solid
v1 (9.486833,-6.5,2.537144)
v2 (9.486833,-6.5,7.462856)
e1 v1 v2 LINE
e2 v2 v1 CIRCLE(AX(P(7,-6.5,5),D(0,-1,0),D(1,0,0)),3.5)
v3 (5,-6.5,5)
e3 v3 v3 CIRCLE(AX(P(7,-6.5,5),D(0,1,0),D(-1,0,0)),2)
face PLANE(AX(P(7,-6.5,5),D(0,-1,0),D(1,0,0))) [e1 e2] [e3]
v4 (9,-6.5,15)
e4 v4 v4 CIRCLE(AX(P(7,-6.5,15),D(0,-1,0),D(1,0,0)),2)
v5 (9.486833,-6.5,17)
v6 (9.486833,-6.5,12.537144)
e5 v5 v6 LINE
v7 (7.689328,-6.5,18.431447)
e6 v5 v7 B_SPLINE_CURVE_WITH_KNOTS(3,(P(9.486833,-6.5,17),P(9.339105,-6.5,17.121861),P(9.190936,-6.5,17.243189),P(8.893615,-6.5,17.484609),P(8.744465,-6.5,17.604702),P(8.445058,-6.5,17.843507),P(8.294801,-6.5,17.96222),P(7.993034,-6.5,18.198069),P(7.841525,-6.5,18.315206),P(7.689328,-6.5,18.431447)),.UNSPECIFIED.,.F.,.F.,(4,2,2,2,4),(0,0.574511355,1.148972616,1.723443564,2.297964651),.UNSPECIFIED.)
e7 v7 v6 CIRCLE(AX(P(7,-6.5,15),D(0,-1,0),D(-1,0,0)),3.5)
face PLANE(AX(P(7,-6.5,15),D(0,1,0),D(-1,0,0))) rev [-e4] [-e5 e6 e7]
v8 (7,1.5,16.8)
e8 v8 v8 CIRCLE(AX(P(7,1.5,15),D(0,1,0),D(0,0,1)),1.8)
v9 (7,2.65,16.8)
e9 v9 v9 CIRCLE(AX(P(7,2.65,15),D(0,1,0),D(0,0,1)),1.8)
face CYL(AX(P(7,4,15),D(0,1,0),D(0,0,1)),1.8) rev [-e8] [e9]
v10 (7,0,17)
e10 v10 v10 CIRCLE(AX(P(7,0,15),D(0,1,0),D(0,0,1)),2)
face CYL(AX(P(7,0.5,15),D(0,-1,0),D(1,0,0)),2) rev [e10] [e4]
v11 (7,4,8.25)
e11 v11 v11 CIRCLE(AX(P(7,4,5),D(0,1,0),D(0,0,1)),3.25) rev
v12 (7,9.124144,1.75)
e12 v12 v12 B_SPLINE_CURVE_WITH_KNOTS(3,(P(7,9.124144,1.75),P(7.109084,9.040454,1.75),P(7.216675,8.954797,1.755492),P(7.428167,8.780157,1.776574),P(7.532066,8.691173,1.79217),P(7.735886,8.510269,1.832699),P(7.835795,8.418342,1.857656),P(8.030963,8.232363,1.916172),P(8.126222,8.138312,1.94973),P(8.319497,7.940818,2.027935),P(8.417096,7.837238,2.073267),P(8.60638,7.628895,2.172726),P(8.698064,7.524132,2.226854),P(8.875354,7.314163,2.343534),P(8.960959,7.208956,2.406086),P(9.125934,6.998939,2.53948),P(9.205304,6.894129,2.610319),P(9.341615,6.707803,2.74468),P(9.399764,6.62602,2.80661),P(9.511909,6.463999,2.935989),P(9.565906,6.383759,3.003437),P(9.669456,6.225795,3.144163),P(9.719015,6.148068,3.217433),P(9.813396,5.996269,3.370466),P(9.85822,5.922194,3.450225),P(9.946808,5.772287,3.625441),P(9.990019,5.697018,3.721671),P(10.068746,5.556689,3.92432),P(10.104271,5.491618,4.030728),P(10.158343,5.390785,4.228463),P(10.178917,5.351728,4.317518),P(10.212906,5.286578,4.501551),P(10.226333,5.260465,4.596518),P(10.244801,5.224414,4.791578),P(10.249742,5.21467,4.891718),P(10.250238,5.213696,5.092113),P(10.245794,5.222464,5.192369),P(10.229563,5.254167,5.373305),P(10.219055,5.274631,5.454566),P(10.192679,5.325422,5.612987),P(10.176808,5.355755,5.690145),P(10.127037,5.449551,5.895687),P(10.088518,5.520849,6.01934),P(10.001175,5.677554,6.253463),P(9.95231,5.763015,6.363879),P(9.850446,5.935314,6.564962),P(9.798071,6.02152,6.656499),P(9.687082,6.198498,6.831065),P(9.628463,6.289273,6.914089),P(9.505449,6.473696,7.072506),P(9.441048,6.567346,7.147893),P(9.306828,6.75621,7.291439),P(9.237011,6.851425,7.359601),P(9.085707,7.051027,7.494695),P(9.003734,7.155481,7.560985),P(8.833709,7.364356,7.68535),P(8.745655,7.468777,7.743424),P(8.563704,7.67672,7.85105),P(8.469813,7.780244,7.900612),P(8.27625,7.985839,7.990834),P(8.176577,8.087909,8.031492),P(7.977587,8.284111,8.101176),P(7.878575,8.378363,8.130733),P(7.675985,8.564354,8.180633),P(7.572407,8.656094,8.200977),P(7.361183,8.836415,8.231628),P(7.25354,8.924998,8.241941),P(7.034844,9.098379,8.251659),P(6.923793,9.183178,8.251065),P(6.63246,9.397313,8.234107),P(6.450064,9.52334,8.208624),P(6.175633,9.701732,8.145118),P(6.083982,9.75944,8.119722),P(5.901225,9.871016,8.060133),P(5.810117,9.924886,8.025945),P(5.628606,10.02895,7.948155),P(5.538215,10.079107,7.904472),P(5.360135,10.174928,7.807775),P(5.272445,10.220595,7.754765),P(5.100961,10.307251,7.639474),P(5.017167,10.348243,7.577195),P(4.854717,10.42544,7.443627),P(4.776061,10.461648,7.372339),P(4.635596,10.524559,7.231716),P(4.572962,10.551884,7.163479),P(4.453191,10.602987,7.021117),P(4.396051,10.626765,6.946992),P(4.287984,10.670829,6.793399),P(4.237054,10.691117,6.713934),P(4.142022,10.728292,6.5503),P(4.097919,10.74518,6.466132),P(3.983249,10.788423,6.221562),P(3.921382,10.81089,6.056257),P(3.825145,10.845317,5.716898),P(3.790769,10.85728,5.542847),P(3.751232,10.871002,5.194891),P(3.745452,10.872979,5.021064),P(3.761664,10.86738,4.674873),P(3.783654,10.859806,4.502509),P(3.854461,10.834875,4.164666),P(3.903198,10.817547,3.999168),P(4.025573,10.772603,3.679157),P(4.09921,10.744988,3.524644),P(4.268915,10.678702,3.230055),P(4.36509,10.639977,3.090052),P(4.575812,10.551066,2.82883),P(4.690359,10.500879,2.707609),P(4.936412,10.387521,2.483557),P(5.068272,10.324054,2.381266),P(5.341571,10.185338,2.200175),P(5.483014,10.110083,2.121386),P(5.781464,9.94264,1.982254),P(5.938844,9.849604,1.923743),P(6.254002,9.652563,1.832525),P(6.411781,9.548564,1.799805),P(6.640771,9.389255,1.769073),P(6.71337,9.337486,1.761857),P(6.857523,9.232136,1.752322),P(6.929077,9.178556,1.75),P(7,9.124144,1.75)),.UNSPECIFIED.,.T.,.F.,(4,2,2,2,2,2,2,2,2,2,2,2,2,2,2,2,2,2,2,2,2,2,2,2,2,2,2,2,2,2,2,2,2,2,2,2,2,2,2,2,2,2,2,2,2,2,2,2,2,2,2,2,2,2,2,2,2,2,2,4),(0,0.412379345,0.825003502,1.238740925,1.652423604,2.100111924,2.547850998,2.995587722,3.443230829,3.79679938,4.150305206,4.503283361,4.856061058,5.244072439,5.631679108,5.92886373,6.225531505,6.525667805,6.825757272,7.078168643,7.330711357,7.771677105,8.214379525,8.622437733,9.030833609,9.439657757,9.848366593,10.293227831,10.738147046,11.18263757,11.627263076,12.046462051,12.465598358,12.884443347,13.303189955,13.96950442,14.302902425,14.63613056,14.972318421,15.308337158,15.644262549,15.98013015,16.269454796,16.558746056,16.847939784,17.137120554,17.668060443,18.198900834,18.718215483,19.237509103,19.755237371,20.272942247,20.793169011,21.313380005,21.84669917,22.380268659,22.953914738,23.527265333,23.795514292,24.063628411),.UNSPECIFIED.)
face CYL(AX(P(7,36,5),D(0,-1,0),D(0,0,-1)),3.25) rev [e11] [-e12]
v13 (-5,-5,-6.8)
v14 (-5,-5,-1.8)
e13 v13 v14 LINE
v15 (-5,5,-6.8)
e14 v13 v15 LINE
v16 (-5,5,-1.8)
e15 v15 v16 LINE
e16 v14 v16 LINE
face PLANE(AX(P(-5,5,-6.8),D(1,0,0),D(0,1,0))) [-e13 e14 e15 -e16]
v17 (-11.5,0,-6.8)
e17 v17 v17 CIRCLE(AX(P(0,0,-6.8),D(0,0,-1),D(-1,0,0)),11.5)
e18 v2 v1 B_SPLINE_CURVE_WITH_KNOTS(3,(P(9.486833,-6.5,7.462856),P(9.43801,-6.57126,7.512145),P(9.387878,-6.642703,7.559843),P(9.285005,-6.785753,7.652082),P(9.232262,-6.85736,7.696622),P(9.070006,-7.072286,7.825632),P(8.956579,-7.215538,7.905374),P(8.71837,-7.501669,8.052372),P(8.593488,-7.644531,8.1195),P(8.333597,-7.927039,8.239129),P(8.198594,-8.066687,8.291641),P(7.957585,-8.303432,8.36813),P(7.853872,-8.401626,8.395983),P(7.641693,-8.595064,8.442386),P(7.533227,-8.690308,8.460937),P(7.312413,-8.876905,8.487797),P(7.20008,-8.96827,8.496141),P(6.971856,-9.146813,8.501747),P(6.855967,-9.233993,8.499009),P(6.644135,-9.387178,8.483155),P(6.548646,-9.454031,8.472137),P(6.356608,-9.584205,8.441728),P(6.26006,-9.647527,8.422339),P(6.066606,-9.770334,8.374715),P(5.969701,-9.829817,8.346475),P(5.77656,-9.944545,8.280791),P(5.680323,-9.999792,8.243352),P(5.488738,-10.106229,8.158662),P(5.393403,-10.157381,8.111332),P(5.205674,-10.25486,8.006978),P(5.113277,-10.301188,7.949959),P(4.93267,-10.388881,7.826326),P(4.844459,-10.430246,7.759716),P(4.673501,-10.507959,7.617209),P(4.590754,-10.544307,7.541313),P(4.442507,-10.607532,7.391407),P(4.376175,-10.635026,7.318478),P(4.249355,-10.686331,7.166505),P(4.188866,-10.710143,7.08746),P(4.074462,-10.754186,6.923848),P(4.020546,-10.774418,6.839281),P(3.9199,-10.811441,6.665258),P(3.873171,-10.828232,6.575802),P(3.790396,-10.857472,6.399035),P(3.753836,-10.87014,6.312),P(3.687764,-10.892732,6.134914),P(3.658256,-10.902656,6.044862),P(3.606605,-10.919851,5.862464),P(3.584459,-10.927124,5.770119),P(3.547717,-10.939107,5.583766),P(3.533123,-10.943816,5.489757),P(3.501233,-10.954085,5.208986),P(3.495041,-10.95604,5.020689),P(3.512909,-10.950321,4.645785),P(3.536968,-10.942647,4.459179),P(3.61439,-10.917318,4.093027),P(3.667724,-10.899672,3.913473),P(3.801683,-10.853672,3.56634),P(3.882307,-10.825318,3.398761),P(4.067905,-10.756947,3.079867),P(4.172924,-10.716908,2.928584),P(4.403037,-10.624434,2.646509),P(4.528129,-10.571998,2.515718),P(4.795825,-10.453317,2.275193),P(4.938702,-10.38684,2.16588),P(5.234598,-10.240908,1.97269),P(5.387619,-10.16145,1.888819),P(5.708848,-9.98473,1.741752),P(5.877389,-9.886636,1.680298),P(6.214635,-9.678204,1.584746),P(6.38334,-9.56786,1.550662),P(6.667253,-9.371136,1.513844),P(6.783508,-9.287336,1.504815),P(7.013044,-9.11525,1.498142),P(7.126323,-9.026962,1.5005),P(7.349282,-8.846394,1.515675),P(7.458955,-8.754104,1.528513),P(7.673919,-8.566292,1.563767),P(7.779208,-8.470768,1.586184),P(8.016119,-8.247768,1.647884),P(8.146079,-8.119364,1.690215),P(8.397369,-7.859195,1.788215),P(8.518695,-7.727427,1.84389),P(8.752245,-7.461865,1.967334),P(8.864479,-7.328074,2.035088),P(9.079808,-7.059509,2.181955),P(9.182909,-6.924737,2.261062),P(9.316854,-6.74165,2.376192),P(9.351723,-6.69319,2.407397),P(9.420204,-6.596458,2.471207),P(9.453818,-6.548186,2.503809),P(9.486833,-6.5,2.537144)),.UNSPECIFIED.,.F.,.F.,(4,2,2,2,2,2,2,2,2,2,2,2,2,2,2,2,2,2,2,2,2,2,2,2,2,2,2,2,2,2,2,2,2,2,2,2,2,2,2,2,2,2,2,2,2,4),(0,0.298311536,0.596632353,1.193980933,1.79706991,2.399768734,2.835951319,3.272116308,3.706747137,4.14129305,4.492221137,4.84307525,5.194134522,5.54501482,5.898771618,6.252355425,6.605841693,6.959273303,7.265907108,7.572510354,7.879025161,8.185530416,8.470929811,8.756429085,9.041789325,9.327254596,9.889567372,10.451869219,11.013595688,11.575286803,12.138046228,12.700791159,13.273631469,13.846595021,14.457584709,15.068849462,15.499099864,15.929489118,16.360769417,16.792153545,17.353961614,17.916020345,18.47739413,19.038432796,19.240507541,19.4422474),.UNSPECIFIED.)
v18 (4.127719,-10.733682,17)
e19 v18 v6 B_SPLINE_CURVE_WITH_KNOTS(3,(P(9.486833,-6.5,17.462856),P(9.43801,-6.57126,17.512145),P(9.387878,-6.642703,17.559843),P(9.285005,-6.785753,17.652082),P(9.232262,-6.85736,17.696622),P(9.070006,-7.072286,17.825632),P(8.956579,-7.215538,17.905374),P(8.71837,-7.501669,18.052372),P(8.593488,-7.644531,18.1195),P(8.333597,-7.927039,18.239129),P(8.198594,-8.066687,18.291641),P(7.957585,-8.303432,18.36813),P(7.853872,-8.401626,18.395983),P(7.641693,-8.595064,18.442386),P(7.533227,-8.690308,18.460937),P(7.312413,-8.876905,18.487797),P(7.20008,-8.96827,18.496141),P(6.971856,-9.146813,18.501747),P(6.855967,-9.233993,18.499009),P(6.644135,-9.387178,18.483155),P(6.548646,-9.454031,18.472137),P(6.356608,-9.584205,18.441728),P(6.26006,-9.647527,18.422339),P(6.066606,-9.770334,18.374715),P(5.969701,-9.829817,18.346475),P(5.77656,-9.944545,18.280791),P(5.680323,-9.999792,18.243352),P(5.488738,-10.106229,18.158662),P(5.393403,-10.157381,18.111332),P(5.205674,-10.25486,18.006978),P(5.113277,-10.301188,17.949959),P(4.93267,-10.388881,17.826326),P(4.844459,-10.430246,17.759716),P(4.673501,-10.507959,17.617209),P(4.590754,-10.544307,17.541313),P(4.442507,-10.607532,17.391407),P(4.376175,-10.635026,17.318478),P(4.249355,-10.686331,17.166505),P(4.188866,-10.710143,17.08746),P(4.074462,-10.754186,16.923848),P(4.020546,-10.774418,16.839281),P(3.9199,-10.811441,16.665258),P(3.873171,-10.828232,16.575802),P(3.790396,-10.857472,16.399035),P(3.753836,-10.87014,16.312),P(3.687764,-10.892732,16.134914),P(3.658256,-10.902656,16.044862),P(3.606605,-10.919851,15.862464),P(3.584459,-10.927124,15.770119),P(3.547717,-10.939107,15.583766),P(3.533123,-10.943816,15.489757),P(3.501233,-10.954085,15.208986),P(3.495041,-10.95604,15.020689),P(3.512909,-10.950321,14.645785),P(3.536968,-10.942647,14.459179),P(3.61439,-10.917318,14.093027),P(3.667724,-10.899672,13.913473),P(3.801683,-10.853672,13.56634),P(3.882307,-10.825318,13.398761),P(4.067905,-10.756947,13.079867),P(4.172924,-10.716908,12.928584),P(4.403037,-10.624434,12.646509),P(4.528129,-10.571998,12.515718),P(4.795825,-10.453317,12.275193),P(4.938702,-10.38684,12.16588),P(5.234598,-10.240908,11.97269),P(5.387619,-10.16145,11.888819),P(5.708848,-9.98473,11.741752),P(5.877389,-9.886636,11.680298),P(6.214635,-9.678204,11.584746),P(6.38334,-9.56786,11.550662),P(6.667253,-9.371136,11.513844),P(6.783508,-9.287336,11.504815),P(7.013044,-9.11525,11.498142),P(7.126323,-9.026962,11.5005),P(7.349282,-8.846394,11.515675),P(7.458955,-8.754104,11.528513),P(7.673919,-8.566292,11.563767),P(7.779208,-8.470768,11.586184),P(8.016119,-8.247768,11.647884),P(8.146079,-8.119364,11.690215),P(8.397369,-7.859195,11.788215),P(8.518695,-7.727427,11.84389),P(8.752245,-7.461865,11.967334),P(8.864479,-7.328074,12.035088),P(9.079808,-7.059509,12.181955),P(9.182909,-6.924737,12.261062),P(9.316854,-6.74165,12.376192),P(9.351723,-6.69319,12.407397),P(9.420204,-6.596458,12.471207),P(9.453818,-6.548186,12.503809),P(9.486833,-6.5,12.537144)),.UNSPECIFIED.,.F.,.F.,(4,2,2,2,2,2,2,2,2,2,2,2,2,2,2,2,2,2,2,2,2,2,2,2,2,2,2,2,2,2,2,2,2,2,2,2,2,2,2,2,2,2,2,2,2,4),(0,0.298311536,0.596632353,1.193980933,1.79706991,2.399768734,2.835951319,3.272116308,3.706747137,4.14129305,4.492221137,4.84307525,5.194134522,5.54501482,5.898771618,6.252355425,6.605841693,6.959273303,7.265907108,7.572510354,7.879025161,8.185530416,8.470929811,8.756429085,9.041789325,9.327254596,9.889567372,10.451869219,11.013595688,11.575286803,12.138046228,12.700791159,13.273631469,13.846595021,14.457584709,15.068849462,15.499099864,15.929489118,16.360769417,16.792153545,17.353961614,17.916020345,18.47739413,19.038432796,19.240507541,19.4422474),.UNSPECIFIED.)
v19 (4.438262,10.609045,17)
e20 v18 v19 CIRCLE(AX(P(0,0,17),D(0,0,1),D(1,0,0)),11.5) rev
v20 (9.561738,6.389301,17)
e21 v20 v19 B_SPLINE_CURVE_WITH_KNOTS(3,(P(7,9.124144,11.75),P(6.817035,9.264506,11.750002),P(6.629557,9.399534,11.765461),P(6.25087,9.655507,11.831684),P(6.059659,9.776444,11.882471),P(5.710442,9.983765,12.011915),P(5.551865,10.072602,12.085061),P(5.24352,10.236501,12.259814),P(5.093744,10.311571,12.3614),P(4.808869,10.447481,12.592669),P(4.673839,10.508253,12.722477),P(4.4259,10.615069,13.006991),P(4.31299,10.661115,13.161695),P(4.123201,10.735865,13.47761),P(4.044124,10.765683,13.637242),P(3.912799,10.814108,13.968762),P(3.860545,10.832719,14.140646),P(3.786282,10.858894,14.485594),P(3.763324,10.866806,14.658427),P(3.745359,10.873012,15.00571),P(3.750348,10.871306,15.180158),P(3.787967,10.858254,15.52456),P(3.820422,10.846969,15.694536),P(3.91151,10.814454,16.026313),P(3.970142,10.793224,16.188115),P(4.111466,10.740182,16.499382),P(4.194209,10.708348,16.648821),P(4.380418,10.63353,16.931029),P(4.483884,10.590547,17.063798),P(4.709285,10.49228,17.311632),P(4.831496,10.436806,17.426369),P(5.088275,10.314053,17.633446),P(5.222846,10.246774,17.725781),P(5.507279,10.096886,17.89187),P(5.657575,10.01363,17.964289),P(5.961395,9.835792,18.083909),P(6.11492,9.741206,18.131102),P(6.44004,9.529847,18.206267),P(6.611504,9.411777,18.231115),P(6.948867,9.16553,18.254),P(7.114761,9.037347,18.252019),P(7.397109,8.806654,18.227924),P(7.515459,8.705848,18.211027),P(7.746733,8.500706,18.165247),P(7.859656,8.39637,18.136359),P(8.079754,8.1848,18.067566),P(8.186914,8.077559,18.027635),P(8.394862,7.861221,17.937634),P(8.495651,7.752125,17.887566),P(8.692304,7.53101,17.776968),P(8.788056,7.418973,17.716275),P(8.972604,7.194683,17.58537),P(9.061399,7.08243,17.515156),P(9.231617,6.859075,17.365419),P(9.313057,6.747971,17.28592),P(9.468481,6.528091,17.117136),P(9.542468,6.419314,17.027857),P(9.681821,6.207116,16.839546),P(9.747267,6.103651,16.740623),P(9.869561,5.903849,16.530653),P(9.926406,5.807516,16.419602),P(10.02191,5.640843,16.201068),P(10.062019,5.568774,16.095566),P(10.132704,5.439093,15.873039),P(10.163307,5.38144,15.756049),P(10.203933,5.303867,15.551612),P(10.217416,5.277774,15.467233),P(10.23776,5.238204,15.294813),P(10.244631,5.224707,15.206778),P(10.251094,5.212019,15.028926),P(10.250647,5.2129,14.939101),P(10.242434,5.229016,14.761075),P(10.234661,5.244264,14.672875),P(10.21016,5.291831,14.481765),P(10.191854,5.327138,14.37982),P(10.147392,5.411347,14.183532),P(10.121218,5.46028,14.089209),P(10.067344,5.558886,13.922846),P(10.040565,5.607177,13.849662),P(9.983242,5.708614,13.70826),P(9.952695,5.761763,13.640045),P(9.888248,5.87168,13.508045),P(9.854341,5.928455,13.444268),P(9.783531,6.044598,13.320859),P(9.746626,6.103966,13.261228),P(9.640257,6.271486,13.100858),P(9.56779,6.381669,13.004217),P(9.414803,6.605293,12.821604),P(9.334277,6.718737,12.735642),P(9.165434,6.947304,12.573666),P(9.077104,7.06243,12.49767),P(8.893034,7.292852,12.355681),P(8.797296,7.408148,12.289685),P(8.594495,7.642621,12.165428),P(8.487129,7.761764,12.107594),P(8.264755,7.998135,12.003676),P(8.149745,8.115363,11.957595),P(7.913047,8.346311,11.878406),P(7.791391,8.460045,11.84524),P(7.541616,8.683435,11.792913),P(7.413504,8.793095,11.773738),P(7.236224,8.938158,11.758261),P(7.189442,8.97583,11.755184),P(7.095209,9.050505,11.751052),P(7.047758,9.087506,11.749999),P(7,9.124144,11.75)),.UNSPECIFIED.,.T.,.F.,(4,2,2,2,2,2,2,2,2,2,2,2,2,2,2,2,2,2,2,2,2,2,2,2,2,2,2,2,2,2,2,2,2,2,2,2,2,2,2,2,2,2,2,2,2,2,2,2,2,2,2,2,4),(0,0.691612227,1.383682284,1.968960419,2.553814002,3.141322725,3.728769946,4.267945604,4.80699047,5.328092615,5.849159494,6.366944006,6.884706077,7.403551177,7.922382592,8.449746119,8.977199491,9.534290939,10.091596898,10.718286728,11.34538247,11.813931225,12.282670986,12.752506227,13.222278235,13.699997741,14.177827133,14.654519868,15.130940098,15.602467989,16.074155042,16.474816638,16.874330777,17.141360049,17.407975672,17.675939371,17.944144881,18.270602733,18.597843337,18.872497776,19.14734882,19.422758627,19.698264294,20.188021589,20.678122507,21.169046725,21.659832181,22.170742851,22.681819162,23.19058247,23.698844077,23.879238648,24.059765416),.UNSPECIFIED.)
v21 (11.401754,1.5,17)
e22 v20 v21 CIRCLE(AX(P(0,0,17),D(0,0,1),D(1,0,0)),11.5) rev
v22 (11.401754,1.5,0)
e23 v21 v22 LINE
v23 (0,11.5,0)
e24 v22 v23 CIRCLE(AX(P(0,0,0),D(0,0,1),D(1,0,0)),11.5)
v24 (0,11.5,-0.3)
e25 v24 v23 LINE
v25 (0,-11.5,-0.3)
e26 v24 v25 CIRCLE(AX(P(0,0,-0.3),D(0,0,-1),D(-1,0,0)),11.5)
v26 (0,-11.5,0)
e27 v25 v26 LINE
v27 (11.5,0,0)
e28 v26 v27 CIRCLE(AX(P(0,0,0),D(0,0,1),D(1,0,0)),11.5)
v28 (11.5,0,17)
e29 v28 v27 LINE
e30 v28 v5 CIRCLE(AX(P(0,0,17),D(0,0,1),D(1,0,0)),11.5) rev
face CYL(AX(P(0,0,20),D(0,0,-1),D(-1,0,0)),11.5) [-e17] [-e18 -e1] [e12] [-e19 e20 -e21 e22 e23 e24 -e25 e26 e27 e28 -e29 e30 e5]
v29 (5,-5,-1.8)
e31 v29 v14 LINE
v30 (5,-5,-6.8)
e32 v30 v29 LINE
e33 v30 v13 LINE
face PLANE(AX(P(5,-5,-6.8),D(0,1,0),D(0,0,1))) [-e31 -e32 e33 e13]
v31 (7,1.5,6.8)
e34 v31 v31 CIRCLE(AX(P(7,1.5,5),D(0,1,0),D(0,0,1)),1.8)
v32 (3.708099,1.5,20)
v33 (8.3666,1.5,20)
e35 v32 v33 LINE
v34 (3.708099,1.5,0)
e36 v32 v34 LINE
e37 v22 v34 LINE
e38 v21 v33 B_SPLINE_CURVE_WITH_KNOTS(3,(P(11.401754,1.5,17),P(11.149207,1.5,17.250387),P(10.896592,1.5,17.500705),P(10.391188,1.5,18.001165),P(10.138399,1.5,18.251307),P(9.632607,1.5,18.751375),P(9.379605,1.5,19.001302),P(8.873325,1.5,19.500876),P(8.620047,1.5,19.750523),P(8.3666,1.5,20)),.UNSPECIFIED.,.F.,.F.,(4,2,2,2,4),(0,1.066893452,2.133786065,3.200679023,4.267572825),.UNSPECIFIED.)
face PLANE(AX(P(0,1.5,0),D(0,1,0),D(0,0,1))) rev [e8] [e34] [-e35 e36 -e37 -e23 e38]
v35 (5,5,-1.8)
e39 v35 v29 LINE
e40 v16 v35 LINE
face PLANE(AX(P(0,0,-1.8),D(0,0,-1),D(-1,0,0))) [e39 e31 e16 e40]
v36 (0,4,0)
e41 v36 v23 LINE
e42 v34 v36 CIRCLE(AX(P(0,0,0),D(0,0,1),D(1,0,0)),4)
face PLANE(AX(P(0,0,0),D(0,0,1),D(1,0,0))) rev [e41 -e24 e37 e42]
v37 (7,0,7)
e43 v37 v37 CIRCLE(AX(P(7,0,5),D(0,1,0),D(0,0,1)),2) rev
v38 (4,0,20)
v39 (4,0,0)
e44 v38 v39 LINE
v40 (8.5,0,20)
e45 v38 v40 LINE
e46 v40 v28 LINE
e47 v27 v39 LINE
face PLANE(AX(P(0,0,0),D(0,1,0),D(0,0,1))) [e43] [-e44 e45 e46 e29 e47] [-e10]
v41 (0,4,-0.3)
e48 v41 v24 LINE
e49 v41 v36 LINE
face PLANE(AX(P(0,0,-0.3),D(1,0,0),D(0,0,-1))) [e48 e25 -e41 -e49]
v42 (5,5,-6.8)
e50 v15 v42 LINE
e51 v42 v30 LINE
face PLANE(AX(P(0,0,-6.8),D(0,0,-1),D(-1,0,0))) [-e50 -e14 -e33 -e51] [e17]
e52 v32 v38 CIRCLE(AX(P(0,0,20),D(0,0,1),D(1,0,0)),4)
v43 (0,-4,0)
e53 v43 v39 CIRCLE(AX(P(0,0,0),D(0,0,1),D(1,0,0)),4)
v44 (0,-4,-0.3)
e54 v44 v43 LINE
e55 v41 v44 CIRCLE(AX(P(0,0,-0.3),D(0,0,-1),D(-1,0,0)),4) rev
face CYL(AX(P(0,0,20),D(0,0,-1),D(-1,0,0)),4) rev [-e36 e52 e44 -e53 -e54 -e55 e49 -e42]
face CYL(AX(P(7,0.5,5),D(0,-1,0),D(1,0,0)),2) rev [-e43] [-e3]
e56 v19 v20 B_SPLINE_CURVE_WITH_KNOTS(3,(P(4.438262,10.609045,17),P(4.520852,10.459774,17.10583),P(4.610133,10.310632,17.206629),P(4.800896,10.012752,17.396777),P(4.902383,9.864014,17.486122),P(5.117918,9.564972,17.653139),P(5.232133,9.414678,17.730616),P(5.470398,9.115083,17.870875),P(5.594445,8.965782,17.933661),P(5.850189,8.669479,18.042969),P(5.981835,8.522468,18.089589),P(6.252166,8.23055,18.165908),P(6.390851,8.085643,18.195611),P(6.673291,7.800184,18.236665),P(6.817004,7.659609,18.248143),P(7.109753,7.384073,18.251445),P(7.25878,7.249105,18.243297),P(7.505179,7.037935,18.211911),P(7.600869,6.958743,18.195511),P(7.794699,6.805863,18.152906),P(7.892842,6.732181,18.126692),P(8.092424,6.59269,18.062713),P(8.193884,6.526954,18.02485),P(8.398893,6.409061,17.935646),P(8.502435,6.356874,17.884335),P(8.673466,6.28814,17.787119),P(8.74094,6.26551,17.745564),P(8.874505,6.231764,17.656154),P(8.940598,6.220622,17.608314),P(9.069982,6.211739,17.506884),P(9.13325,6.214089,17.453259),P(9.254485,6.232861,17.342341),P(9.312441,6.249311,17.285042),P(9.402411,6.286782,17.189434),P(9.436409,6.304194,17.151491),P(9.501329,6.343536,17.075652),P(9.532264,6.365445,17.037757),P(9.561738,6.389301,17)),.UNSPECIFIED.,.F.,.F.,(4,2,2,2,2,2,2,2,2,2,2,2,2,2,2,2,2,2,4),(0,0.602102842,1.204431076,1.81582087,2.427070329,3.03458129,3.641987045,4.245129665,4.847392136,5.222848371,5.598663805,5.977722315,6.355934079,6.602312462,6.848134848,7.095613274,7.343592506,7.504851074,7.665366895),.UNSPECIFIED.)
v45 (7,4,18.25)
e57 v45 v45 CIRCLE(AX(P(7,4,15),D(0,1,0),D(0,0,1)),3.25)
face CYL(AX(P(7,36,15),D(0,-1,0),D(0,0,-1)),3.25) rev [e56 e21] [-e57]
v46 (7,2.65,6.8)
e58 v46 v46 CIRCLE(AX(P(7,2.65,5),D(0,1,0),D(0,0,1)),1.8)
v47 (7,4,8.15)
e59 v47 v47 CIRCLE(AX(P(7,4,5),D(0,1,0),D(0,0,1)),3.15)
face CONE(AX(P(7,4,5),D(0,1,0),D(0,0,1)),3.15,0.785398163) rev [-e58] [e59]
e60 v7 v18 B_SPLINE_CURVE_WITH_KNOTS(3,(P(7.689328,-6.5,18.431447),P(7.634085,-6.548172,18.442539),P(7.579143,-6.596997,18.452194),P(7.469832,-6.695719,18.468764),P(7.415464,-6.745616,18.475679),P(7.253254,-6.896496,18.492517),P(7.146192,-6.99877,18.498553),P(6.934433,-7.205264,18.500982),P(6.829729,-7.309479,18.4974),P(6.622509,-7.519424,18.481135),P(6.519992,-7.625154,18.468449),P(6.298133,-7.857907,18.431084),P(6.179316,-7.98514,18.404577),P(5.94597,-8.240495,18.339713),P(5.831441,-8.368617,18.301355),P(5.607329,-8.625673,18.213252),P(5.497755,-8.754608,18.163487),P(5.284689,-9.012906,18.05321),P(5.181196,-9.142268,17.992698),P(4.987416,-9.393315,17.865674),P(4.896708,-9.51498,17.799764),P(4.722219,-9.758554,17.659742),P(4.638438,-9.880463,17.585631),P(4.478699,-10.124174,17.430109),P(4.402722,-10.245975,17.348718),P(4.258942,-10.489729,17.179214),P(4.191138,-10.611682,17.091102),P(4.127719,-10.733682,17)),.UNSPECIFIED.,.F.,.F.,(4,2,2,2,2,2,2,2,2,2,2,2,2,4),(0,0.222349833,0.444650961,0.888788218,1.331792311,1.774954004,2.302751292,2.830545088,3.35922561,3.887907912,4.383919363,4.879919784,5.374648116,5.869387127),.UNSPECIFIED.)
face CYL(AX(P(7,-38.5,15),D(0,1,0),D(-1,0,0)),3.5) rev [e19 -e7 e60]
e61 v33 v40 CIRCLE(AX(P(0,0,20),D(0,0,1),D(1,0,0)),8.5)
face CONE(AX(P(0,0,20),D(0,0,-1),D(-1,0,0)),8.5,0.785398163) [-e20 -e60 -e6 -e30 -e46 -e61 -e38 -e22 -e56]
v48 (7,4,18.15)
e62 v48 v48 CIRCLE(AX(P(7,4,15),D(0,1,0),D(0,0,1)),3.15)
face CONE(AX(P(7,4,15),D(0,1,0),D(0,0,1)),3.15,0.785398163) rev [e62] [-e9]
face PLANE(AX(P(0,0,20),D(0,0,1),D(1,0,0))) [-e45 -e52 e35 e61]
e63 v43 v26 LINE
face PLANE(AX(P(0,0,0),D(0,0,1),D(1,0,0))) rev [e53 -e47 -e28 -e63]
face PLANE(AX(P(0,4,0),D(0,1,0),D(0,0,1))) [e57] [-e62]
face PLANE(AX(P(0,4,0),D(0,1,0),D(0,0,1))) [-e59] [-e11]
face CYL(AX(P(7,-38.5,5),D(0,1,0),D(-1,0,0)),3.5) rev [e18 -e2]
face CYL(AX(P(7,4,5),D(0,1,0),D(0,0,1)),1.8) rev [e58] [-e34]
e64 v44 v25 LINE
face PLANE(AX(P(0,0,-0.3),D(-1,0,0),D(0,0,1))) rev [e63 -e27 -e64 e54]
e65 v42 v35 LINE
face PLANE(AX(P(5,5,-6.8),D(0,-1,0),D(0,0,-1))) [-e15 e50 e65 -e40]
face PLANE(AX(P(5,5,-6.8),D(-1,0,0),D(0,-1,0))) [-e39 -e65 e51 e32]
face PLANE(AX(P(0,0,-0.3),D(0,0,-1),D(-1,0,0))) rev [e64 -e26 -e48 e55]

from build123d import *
from build123d.topology import SkipClean

# Parameters (mm, degrees)
SZKIC1_R                                           = 11.5
SZKIC1_R_2                                         = 4
DODANIE_WYCI_GNI_CIE1_DEPTH                        = 20
SZKIC3_W                                           = 11.5
SZKIC3_H                                           = 20
WYTNIJ_WYCI_GNI_CIE1_DEPTH                         = 1.5
WYTNIJ_WYCI_GNI_CIE2_DEPTH                         = 32
POG_BIENIE_STO_KOWE_POD_M3_WKR_T_Z_BEM_D           = 3.6
POG_BIENIE_STO_KOWE_POD_M3_WKR_T_Z_BEM_CSINK_D     = 6.3
POG_BIENIE_STO_KOWE_POD_M3_WKR_T_Z_BEM_CSINK_ANGLE = 90
SZKIC7_R                                           = 3.5
WYTNIJ_WYCI_GNI_CIE3_DEPTH                         = 32
SZKIC8_R                                           = 2
WYTNIJ_WYCI_GNI_CIE4_DEPTH                         = 7
DODANIE_WYCI_GNI_CIE2_START                        = 0.3
DODANIE_WYCI_GNI_CIE2_DEPTH                        = 0.3
DODANIE_WYCI_GNI_CIE3_START                        = 1.5
SZKIC10_R                                          = 11.5
DODANIE_WYCI_GNI_CIE3_DEPTH                        = 1.5
DODANIE_WYCI_GNI_CIE4_START                        = 5
SZKIC11_R                                          = 11.5
SZKIC11_W                                          = 10
SZKIC11_H                                          = 10
DODANIE_WYCI_GNI_CIE4_DEPTH                        = 5
SFAZOWANIE1_SIZE                                   = 3


with BuildPart() as part:
    # Szkic1 → Dodanie-wyciągnięcie1 (new body)
    with BuildSketch(Plane.XY):
        with Locations(Location((0, 0, 0), (0, 0, 180))):
            Circle(SZKIC1_R)
        with Locations(Location((0, 0, 0), (0, 0, 180))):
            Circle(SZKIC1_R_2, mode=Mode.SUBTRACT)
    extrude(amount=DODANIE_WYCI_GNI_CIE1_DEPTH)

    # Szkic3 → Wytnij-wyciągnięcie1 (cut)
    with BuildSketch(Plane(origin=(0, 0, 0), x_dir=(1, 0, 0), z_dir=(0, 1, 0))):
        with Locations((5.75, -10)):
            Rectangle(SZKIC3_W, SZKIC3_H)
    extrude(amount=WYTNIJ_WYCI_GNI_CIE1_DEPTH, mode=Mode.SUBTRACT)

    # Szkic4 → Wytnij-wyciągnięcie2 (cut)
    with BuildSketch(Plane(origin=(0, 4, 0), x_dir=(1, 0, 0), z_dir=(0, 1, 0))):
        with BuildLine():
            ThreePointArc((7, -11.75), (3.75, -15), (7, -18.25))
            Line((7, -18.25), (7, -11.75))
        make_face()
        with BuildLine():
            Line((7, -11.75), (7, -18.25))
            ThreePointArc((7, -18.25), (9.298097039, -17.298097039), (10.25, -15))
            ThreePointArc((10.25, -15), (9.298097039, -12.701902961), (7, -11.75))
        make_face()
        with BuildLine():
            ThreePointArc((7, -1.75), (3.75, -5), (7, -8.25))
            Line((7, -8.25), (7, -1.75))
        make_face()
        with BuildLine():
            Line((7, -1.75), (7, -8.25))
            ThreePointArc((7, -8.25), (9.298097039, -7.298097039), (10.25, -5))
            ThreePointArc((10.25, -5), (9.298097039, -2.701902961), (7, -1.75))
        make_face()
    extrude(amount=WYTNIJ_WYCI_GNI_CIE2_DEPTH, mode=Mode.SUBTRACT)

    # Pogłębienie stożkowe pod M3 Wkręt z łbem płaskim1 (through all)
    with Locations(Plane(origin=(7, 4, 15), x_dir=(0, 0, 1), z_dir=(0, 1, 0))):
        with Locations((0, 0), (-10, 0)):
            CounterSinkHole(POG_BIENIE_STO_KOWE_POD_M3_WKR_T_Z_BEM_D / 2, POG_BIENIE_STO_KOWE_POD_M3_WKR_T_Z_BEM_CSINK_D / 2, counter_sink_angle=POG_BIENIE_STO_KOWE_POD_M3_WKR_T_Z_BEM_CSINK_ANGLE)

    # Szkic7 → Wytnij-wyciągnięcie3 (cut)
    with BuildSketch(Plane(origin=(0, -6.5, 0), x_dir=(-1, 0, 0), z_dir=(0, -1, 0))):
        with Locations((-7, -5)):
            Circle(SZKIC7_R)
        with Locations((-7, -15)):
            Circle(SZKIC7_R)
    extrude(amount=WYTNIJ_WYCI_GNI_CIE3_DEPTH, mode=Mode.SUBTRACT)

    # Szkic8 → Wytnij-wyciągnięcie4 (cut)
    with BuildSketch(Plane.XZ.offset(6.5)):
        with Locations((7, 15)):
            Circle(SZKIC8_R)
        with Locations(Location((7, 5, 0), (0, 0, 90))):
            Circle(SZKIC8_R)
    extrude(amount=-WYTNIJ_WYCI_GNI_CIE4_DEPTH, mode=Mode.SUBTRACT)

    # Szkic9 → Dodanie-wyciągnięcie2 (add)
    with SkipClean():  # the faces are left unmerged after this step: merging them gives an invalid solid
        with BuildSketch(Plane(origin=(0, 0, 0), x_dir=(-1, 0, 0), z_dir=(0, 0, -1)).offset(DODANIE_WYCI_GNI_CIE2_START)):
            with BuildLine():
                Line((0, 11.5), (0, 4))
                ThreePointArc((0, 4), (4, 0), (0, -4))
                Line((0, -4), (0, -11.5))
                ThreePointArc((0, -11.5), (11.5, 0), (0, 11.5))
            make_face()
        extrude(amount=-DODANIE_WYCI_GNI_CIE2_DEPTH)

    # Szkic10 → Dodanie-wyciągnięcie3 (add)
    with SkipClean():  # the faces are left unmerged after this step: merging them gives an invalid solid
        with BuildSketch(Plane(origin=(0, 0, -0.3), x_dir=(-1, 0, 0), z_dir=(0, 0, -1)).offset(DODANIE_WYCI_GNI_CIE3_START)):
            Circle(SZKIC10_R)
        extrude(amount=-DODANIE_WYCI_GNI_CIE3_DEPTH)

    # Szkic11 → Dodanie-wyciągnięcie4 (add)
    with SkipClean():  # the faces are left unmerged after this step: merging them gives an invalid solid
        with BuildSketch(Plane(origin=(0, 0, -1.8), x_dir=(-1, 0, 0), z_dir=(0, 0, -1)).offset(DODANIE_WYCI_GNI_CIE4_START)):
            Circle(SZKIC11_R)
            Rectangle(SZKIC11_W, SZKIC11_H, mode=Mode.SUBTRACT)
        extrude(amount=-DODANIE_WYCI_GNI_CIE4_DEPTH)

    # Sfazowanie1
    # the kernel refuses this chamfer: 3 mm, written as the material it takes off along each edge
    with BuildSketch(Plane(origin=(0, 0, 20), x_dir=(-1, 0, 0), z_dir=(0, 1, 0))) as sfazowanie1_piece_1:
        Polygon((11.5, -SFAZOWANIE1_SIZE), (11.5 - SFAZOWANIE1_SIZE, 0), (11.5, 0), align=None)
    revolve(axis=Axis((0, 0, 20), (0, 0, 1)), revolution_arc=218.500054596, mode=Mode.SUBTRACT)
    with BuildSketch(Plane(origin=(0, 0, 20), x_dir=(0.8571646812696857, -0.5150424343525863, 0), z_dir=(-0.5150424343525863, -0.8571646812696857, 0))) as sfazowanie1_piece_2:
        Polygon((11.5, -SFAZOWANIE1_SIZE), (11.5 - SFAZOWANIE1_SIZE, 0), (11.5, 0), align=None)
    revolve(axis=Axis((0, 0, 20), (0, 0, 1)), revolution_arc=211.000291399, mode=Mode.SUBTRACT)


solid = part.part
